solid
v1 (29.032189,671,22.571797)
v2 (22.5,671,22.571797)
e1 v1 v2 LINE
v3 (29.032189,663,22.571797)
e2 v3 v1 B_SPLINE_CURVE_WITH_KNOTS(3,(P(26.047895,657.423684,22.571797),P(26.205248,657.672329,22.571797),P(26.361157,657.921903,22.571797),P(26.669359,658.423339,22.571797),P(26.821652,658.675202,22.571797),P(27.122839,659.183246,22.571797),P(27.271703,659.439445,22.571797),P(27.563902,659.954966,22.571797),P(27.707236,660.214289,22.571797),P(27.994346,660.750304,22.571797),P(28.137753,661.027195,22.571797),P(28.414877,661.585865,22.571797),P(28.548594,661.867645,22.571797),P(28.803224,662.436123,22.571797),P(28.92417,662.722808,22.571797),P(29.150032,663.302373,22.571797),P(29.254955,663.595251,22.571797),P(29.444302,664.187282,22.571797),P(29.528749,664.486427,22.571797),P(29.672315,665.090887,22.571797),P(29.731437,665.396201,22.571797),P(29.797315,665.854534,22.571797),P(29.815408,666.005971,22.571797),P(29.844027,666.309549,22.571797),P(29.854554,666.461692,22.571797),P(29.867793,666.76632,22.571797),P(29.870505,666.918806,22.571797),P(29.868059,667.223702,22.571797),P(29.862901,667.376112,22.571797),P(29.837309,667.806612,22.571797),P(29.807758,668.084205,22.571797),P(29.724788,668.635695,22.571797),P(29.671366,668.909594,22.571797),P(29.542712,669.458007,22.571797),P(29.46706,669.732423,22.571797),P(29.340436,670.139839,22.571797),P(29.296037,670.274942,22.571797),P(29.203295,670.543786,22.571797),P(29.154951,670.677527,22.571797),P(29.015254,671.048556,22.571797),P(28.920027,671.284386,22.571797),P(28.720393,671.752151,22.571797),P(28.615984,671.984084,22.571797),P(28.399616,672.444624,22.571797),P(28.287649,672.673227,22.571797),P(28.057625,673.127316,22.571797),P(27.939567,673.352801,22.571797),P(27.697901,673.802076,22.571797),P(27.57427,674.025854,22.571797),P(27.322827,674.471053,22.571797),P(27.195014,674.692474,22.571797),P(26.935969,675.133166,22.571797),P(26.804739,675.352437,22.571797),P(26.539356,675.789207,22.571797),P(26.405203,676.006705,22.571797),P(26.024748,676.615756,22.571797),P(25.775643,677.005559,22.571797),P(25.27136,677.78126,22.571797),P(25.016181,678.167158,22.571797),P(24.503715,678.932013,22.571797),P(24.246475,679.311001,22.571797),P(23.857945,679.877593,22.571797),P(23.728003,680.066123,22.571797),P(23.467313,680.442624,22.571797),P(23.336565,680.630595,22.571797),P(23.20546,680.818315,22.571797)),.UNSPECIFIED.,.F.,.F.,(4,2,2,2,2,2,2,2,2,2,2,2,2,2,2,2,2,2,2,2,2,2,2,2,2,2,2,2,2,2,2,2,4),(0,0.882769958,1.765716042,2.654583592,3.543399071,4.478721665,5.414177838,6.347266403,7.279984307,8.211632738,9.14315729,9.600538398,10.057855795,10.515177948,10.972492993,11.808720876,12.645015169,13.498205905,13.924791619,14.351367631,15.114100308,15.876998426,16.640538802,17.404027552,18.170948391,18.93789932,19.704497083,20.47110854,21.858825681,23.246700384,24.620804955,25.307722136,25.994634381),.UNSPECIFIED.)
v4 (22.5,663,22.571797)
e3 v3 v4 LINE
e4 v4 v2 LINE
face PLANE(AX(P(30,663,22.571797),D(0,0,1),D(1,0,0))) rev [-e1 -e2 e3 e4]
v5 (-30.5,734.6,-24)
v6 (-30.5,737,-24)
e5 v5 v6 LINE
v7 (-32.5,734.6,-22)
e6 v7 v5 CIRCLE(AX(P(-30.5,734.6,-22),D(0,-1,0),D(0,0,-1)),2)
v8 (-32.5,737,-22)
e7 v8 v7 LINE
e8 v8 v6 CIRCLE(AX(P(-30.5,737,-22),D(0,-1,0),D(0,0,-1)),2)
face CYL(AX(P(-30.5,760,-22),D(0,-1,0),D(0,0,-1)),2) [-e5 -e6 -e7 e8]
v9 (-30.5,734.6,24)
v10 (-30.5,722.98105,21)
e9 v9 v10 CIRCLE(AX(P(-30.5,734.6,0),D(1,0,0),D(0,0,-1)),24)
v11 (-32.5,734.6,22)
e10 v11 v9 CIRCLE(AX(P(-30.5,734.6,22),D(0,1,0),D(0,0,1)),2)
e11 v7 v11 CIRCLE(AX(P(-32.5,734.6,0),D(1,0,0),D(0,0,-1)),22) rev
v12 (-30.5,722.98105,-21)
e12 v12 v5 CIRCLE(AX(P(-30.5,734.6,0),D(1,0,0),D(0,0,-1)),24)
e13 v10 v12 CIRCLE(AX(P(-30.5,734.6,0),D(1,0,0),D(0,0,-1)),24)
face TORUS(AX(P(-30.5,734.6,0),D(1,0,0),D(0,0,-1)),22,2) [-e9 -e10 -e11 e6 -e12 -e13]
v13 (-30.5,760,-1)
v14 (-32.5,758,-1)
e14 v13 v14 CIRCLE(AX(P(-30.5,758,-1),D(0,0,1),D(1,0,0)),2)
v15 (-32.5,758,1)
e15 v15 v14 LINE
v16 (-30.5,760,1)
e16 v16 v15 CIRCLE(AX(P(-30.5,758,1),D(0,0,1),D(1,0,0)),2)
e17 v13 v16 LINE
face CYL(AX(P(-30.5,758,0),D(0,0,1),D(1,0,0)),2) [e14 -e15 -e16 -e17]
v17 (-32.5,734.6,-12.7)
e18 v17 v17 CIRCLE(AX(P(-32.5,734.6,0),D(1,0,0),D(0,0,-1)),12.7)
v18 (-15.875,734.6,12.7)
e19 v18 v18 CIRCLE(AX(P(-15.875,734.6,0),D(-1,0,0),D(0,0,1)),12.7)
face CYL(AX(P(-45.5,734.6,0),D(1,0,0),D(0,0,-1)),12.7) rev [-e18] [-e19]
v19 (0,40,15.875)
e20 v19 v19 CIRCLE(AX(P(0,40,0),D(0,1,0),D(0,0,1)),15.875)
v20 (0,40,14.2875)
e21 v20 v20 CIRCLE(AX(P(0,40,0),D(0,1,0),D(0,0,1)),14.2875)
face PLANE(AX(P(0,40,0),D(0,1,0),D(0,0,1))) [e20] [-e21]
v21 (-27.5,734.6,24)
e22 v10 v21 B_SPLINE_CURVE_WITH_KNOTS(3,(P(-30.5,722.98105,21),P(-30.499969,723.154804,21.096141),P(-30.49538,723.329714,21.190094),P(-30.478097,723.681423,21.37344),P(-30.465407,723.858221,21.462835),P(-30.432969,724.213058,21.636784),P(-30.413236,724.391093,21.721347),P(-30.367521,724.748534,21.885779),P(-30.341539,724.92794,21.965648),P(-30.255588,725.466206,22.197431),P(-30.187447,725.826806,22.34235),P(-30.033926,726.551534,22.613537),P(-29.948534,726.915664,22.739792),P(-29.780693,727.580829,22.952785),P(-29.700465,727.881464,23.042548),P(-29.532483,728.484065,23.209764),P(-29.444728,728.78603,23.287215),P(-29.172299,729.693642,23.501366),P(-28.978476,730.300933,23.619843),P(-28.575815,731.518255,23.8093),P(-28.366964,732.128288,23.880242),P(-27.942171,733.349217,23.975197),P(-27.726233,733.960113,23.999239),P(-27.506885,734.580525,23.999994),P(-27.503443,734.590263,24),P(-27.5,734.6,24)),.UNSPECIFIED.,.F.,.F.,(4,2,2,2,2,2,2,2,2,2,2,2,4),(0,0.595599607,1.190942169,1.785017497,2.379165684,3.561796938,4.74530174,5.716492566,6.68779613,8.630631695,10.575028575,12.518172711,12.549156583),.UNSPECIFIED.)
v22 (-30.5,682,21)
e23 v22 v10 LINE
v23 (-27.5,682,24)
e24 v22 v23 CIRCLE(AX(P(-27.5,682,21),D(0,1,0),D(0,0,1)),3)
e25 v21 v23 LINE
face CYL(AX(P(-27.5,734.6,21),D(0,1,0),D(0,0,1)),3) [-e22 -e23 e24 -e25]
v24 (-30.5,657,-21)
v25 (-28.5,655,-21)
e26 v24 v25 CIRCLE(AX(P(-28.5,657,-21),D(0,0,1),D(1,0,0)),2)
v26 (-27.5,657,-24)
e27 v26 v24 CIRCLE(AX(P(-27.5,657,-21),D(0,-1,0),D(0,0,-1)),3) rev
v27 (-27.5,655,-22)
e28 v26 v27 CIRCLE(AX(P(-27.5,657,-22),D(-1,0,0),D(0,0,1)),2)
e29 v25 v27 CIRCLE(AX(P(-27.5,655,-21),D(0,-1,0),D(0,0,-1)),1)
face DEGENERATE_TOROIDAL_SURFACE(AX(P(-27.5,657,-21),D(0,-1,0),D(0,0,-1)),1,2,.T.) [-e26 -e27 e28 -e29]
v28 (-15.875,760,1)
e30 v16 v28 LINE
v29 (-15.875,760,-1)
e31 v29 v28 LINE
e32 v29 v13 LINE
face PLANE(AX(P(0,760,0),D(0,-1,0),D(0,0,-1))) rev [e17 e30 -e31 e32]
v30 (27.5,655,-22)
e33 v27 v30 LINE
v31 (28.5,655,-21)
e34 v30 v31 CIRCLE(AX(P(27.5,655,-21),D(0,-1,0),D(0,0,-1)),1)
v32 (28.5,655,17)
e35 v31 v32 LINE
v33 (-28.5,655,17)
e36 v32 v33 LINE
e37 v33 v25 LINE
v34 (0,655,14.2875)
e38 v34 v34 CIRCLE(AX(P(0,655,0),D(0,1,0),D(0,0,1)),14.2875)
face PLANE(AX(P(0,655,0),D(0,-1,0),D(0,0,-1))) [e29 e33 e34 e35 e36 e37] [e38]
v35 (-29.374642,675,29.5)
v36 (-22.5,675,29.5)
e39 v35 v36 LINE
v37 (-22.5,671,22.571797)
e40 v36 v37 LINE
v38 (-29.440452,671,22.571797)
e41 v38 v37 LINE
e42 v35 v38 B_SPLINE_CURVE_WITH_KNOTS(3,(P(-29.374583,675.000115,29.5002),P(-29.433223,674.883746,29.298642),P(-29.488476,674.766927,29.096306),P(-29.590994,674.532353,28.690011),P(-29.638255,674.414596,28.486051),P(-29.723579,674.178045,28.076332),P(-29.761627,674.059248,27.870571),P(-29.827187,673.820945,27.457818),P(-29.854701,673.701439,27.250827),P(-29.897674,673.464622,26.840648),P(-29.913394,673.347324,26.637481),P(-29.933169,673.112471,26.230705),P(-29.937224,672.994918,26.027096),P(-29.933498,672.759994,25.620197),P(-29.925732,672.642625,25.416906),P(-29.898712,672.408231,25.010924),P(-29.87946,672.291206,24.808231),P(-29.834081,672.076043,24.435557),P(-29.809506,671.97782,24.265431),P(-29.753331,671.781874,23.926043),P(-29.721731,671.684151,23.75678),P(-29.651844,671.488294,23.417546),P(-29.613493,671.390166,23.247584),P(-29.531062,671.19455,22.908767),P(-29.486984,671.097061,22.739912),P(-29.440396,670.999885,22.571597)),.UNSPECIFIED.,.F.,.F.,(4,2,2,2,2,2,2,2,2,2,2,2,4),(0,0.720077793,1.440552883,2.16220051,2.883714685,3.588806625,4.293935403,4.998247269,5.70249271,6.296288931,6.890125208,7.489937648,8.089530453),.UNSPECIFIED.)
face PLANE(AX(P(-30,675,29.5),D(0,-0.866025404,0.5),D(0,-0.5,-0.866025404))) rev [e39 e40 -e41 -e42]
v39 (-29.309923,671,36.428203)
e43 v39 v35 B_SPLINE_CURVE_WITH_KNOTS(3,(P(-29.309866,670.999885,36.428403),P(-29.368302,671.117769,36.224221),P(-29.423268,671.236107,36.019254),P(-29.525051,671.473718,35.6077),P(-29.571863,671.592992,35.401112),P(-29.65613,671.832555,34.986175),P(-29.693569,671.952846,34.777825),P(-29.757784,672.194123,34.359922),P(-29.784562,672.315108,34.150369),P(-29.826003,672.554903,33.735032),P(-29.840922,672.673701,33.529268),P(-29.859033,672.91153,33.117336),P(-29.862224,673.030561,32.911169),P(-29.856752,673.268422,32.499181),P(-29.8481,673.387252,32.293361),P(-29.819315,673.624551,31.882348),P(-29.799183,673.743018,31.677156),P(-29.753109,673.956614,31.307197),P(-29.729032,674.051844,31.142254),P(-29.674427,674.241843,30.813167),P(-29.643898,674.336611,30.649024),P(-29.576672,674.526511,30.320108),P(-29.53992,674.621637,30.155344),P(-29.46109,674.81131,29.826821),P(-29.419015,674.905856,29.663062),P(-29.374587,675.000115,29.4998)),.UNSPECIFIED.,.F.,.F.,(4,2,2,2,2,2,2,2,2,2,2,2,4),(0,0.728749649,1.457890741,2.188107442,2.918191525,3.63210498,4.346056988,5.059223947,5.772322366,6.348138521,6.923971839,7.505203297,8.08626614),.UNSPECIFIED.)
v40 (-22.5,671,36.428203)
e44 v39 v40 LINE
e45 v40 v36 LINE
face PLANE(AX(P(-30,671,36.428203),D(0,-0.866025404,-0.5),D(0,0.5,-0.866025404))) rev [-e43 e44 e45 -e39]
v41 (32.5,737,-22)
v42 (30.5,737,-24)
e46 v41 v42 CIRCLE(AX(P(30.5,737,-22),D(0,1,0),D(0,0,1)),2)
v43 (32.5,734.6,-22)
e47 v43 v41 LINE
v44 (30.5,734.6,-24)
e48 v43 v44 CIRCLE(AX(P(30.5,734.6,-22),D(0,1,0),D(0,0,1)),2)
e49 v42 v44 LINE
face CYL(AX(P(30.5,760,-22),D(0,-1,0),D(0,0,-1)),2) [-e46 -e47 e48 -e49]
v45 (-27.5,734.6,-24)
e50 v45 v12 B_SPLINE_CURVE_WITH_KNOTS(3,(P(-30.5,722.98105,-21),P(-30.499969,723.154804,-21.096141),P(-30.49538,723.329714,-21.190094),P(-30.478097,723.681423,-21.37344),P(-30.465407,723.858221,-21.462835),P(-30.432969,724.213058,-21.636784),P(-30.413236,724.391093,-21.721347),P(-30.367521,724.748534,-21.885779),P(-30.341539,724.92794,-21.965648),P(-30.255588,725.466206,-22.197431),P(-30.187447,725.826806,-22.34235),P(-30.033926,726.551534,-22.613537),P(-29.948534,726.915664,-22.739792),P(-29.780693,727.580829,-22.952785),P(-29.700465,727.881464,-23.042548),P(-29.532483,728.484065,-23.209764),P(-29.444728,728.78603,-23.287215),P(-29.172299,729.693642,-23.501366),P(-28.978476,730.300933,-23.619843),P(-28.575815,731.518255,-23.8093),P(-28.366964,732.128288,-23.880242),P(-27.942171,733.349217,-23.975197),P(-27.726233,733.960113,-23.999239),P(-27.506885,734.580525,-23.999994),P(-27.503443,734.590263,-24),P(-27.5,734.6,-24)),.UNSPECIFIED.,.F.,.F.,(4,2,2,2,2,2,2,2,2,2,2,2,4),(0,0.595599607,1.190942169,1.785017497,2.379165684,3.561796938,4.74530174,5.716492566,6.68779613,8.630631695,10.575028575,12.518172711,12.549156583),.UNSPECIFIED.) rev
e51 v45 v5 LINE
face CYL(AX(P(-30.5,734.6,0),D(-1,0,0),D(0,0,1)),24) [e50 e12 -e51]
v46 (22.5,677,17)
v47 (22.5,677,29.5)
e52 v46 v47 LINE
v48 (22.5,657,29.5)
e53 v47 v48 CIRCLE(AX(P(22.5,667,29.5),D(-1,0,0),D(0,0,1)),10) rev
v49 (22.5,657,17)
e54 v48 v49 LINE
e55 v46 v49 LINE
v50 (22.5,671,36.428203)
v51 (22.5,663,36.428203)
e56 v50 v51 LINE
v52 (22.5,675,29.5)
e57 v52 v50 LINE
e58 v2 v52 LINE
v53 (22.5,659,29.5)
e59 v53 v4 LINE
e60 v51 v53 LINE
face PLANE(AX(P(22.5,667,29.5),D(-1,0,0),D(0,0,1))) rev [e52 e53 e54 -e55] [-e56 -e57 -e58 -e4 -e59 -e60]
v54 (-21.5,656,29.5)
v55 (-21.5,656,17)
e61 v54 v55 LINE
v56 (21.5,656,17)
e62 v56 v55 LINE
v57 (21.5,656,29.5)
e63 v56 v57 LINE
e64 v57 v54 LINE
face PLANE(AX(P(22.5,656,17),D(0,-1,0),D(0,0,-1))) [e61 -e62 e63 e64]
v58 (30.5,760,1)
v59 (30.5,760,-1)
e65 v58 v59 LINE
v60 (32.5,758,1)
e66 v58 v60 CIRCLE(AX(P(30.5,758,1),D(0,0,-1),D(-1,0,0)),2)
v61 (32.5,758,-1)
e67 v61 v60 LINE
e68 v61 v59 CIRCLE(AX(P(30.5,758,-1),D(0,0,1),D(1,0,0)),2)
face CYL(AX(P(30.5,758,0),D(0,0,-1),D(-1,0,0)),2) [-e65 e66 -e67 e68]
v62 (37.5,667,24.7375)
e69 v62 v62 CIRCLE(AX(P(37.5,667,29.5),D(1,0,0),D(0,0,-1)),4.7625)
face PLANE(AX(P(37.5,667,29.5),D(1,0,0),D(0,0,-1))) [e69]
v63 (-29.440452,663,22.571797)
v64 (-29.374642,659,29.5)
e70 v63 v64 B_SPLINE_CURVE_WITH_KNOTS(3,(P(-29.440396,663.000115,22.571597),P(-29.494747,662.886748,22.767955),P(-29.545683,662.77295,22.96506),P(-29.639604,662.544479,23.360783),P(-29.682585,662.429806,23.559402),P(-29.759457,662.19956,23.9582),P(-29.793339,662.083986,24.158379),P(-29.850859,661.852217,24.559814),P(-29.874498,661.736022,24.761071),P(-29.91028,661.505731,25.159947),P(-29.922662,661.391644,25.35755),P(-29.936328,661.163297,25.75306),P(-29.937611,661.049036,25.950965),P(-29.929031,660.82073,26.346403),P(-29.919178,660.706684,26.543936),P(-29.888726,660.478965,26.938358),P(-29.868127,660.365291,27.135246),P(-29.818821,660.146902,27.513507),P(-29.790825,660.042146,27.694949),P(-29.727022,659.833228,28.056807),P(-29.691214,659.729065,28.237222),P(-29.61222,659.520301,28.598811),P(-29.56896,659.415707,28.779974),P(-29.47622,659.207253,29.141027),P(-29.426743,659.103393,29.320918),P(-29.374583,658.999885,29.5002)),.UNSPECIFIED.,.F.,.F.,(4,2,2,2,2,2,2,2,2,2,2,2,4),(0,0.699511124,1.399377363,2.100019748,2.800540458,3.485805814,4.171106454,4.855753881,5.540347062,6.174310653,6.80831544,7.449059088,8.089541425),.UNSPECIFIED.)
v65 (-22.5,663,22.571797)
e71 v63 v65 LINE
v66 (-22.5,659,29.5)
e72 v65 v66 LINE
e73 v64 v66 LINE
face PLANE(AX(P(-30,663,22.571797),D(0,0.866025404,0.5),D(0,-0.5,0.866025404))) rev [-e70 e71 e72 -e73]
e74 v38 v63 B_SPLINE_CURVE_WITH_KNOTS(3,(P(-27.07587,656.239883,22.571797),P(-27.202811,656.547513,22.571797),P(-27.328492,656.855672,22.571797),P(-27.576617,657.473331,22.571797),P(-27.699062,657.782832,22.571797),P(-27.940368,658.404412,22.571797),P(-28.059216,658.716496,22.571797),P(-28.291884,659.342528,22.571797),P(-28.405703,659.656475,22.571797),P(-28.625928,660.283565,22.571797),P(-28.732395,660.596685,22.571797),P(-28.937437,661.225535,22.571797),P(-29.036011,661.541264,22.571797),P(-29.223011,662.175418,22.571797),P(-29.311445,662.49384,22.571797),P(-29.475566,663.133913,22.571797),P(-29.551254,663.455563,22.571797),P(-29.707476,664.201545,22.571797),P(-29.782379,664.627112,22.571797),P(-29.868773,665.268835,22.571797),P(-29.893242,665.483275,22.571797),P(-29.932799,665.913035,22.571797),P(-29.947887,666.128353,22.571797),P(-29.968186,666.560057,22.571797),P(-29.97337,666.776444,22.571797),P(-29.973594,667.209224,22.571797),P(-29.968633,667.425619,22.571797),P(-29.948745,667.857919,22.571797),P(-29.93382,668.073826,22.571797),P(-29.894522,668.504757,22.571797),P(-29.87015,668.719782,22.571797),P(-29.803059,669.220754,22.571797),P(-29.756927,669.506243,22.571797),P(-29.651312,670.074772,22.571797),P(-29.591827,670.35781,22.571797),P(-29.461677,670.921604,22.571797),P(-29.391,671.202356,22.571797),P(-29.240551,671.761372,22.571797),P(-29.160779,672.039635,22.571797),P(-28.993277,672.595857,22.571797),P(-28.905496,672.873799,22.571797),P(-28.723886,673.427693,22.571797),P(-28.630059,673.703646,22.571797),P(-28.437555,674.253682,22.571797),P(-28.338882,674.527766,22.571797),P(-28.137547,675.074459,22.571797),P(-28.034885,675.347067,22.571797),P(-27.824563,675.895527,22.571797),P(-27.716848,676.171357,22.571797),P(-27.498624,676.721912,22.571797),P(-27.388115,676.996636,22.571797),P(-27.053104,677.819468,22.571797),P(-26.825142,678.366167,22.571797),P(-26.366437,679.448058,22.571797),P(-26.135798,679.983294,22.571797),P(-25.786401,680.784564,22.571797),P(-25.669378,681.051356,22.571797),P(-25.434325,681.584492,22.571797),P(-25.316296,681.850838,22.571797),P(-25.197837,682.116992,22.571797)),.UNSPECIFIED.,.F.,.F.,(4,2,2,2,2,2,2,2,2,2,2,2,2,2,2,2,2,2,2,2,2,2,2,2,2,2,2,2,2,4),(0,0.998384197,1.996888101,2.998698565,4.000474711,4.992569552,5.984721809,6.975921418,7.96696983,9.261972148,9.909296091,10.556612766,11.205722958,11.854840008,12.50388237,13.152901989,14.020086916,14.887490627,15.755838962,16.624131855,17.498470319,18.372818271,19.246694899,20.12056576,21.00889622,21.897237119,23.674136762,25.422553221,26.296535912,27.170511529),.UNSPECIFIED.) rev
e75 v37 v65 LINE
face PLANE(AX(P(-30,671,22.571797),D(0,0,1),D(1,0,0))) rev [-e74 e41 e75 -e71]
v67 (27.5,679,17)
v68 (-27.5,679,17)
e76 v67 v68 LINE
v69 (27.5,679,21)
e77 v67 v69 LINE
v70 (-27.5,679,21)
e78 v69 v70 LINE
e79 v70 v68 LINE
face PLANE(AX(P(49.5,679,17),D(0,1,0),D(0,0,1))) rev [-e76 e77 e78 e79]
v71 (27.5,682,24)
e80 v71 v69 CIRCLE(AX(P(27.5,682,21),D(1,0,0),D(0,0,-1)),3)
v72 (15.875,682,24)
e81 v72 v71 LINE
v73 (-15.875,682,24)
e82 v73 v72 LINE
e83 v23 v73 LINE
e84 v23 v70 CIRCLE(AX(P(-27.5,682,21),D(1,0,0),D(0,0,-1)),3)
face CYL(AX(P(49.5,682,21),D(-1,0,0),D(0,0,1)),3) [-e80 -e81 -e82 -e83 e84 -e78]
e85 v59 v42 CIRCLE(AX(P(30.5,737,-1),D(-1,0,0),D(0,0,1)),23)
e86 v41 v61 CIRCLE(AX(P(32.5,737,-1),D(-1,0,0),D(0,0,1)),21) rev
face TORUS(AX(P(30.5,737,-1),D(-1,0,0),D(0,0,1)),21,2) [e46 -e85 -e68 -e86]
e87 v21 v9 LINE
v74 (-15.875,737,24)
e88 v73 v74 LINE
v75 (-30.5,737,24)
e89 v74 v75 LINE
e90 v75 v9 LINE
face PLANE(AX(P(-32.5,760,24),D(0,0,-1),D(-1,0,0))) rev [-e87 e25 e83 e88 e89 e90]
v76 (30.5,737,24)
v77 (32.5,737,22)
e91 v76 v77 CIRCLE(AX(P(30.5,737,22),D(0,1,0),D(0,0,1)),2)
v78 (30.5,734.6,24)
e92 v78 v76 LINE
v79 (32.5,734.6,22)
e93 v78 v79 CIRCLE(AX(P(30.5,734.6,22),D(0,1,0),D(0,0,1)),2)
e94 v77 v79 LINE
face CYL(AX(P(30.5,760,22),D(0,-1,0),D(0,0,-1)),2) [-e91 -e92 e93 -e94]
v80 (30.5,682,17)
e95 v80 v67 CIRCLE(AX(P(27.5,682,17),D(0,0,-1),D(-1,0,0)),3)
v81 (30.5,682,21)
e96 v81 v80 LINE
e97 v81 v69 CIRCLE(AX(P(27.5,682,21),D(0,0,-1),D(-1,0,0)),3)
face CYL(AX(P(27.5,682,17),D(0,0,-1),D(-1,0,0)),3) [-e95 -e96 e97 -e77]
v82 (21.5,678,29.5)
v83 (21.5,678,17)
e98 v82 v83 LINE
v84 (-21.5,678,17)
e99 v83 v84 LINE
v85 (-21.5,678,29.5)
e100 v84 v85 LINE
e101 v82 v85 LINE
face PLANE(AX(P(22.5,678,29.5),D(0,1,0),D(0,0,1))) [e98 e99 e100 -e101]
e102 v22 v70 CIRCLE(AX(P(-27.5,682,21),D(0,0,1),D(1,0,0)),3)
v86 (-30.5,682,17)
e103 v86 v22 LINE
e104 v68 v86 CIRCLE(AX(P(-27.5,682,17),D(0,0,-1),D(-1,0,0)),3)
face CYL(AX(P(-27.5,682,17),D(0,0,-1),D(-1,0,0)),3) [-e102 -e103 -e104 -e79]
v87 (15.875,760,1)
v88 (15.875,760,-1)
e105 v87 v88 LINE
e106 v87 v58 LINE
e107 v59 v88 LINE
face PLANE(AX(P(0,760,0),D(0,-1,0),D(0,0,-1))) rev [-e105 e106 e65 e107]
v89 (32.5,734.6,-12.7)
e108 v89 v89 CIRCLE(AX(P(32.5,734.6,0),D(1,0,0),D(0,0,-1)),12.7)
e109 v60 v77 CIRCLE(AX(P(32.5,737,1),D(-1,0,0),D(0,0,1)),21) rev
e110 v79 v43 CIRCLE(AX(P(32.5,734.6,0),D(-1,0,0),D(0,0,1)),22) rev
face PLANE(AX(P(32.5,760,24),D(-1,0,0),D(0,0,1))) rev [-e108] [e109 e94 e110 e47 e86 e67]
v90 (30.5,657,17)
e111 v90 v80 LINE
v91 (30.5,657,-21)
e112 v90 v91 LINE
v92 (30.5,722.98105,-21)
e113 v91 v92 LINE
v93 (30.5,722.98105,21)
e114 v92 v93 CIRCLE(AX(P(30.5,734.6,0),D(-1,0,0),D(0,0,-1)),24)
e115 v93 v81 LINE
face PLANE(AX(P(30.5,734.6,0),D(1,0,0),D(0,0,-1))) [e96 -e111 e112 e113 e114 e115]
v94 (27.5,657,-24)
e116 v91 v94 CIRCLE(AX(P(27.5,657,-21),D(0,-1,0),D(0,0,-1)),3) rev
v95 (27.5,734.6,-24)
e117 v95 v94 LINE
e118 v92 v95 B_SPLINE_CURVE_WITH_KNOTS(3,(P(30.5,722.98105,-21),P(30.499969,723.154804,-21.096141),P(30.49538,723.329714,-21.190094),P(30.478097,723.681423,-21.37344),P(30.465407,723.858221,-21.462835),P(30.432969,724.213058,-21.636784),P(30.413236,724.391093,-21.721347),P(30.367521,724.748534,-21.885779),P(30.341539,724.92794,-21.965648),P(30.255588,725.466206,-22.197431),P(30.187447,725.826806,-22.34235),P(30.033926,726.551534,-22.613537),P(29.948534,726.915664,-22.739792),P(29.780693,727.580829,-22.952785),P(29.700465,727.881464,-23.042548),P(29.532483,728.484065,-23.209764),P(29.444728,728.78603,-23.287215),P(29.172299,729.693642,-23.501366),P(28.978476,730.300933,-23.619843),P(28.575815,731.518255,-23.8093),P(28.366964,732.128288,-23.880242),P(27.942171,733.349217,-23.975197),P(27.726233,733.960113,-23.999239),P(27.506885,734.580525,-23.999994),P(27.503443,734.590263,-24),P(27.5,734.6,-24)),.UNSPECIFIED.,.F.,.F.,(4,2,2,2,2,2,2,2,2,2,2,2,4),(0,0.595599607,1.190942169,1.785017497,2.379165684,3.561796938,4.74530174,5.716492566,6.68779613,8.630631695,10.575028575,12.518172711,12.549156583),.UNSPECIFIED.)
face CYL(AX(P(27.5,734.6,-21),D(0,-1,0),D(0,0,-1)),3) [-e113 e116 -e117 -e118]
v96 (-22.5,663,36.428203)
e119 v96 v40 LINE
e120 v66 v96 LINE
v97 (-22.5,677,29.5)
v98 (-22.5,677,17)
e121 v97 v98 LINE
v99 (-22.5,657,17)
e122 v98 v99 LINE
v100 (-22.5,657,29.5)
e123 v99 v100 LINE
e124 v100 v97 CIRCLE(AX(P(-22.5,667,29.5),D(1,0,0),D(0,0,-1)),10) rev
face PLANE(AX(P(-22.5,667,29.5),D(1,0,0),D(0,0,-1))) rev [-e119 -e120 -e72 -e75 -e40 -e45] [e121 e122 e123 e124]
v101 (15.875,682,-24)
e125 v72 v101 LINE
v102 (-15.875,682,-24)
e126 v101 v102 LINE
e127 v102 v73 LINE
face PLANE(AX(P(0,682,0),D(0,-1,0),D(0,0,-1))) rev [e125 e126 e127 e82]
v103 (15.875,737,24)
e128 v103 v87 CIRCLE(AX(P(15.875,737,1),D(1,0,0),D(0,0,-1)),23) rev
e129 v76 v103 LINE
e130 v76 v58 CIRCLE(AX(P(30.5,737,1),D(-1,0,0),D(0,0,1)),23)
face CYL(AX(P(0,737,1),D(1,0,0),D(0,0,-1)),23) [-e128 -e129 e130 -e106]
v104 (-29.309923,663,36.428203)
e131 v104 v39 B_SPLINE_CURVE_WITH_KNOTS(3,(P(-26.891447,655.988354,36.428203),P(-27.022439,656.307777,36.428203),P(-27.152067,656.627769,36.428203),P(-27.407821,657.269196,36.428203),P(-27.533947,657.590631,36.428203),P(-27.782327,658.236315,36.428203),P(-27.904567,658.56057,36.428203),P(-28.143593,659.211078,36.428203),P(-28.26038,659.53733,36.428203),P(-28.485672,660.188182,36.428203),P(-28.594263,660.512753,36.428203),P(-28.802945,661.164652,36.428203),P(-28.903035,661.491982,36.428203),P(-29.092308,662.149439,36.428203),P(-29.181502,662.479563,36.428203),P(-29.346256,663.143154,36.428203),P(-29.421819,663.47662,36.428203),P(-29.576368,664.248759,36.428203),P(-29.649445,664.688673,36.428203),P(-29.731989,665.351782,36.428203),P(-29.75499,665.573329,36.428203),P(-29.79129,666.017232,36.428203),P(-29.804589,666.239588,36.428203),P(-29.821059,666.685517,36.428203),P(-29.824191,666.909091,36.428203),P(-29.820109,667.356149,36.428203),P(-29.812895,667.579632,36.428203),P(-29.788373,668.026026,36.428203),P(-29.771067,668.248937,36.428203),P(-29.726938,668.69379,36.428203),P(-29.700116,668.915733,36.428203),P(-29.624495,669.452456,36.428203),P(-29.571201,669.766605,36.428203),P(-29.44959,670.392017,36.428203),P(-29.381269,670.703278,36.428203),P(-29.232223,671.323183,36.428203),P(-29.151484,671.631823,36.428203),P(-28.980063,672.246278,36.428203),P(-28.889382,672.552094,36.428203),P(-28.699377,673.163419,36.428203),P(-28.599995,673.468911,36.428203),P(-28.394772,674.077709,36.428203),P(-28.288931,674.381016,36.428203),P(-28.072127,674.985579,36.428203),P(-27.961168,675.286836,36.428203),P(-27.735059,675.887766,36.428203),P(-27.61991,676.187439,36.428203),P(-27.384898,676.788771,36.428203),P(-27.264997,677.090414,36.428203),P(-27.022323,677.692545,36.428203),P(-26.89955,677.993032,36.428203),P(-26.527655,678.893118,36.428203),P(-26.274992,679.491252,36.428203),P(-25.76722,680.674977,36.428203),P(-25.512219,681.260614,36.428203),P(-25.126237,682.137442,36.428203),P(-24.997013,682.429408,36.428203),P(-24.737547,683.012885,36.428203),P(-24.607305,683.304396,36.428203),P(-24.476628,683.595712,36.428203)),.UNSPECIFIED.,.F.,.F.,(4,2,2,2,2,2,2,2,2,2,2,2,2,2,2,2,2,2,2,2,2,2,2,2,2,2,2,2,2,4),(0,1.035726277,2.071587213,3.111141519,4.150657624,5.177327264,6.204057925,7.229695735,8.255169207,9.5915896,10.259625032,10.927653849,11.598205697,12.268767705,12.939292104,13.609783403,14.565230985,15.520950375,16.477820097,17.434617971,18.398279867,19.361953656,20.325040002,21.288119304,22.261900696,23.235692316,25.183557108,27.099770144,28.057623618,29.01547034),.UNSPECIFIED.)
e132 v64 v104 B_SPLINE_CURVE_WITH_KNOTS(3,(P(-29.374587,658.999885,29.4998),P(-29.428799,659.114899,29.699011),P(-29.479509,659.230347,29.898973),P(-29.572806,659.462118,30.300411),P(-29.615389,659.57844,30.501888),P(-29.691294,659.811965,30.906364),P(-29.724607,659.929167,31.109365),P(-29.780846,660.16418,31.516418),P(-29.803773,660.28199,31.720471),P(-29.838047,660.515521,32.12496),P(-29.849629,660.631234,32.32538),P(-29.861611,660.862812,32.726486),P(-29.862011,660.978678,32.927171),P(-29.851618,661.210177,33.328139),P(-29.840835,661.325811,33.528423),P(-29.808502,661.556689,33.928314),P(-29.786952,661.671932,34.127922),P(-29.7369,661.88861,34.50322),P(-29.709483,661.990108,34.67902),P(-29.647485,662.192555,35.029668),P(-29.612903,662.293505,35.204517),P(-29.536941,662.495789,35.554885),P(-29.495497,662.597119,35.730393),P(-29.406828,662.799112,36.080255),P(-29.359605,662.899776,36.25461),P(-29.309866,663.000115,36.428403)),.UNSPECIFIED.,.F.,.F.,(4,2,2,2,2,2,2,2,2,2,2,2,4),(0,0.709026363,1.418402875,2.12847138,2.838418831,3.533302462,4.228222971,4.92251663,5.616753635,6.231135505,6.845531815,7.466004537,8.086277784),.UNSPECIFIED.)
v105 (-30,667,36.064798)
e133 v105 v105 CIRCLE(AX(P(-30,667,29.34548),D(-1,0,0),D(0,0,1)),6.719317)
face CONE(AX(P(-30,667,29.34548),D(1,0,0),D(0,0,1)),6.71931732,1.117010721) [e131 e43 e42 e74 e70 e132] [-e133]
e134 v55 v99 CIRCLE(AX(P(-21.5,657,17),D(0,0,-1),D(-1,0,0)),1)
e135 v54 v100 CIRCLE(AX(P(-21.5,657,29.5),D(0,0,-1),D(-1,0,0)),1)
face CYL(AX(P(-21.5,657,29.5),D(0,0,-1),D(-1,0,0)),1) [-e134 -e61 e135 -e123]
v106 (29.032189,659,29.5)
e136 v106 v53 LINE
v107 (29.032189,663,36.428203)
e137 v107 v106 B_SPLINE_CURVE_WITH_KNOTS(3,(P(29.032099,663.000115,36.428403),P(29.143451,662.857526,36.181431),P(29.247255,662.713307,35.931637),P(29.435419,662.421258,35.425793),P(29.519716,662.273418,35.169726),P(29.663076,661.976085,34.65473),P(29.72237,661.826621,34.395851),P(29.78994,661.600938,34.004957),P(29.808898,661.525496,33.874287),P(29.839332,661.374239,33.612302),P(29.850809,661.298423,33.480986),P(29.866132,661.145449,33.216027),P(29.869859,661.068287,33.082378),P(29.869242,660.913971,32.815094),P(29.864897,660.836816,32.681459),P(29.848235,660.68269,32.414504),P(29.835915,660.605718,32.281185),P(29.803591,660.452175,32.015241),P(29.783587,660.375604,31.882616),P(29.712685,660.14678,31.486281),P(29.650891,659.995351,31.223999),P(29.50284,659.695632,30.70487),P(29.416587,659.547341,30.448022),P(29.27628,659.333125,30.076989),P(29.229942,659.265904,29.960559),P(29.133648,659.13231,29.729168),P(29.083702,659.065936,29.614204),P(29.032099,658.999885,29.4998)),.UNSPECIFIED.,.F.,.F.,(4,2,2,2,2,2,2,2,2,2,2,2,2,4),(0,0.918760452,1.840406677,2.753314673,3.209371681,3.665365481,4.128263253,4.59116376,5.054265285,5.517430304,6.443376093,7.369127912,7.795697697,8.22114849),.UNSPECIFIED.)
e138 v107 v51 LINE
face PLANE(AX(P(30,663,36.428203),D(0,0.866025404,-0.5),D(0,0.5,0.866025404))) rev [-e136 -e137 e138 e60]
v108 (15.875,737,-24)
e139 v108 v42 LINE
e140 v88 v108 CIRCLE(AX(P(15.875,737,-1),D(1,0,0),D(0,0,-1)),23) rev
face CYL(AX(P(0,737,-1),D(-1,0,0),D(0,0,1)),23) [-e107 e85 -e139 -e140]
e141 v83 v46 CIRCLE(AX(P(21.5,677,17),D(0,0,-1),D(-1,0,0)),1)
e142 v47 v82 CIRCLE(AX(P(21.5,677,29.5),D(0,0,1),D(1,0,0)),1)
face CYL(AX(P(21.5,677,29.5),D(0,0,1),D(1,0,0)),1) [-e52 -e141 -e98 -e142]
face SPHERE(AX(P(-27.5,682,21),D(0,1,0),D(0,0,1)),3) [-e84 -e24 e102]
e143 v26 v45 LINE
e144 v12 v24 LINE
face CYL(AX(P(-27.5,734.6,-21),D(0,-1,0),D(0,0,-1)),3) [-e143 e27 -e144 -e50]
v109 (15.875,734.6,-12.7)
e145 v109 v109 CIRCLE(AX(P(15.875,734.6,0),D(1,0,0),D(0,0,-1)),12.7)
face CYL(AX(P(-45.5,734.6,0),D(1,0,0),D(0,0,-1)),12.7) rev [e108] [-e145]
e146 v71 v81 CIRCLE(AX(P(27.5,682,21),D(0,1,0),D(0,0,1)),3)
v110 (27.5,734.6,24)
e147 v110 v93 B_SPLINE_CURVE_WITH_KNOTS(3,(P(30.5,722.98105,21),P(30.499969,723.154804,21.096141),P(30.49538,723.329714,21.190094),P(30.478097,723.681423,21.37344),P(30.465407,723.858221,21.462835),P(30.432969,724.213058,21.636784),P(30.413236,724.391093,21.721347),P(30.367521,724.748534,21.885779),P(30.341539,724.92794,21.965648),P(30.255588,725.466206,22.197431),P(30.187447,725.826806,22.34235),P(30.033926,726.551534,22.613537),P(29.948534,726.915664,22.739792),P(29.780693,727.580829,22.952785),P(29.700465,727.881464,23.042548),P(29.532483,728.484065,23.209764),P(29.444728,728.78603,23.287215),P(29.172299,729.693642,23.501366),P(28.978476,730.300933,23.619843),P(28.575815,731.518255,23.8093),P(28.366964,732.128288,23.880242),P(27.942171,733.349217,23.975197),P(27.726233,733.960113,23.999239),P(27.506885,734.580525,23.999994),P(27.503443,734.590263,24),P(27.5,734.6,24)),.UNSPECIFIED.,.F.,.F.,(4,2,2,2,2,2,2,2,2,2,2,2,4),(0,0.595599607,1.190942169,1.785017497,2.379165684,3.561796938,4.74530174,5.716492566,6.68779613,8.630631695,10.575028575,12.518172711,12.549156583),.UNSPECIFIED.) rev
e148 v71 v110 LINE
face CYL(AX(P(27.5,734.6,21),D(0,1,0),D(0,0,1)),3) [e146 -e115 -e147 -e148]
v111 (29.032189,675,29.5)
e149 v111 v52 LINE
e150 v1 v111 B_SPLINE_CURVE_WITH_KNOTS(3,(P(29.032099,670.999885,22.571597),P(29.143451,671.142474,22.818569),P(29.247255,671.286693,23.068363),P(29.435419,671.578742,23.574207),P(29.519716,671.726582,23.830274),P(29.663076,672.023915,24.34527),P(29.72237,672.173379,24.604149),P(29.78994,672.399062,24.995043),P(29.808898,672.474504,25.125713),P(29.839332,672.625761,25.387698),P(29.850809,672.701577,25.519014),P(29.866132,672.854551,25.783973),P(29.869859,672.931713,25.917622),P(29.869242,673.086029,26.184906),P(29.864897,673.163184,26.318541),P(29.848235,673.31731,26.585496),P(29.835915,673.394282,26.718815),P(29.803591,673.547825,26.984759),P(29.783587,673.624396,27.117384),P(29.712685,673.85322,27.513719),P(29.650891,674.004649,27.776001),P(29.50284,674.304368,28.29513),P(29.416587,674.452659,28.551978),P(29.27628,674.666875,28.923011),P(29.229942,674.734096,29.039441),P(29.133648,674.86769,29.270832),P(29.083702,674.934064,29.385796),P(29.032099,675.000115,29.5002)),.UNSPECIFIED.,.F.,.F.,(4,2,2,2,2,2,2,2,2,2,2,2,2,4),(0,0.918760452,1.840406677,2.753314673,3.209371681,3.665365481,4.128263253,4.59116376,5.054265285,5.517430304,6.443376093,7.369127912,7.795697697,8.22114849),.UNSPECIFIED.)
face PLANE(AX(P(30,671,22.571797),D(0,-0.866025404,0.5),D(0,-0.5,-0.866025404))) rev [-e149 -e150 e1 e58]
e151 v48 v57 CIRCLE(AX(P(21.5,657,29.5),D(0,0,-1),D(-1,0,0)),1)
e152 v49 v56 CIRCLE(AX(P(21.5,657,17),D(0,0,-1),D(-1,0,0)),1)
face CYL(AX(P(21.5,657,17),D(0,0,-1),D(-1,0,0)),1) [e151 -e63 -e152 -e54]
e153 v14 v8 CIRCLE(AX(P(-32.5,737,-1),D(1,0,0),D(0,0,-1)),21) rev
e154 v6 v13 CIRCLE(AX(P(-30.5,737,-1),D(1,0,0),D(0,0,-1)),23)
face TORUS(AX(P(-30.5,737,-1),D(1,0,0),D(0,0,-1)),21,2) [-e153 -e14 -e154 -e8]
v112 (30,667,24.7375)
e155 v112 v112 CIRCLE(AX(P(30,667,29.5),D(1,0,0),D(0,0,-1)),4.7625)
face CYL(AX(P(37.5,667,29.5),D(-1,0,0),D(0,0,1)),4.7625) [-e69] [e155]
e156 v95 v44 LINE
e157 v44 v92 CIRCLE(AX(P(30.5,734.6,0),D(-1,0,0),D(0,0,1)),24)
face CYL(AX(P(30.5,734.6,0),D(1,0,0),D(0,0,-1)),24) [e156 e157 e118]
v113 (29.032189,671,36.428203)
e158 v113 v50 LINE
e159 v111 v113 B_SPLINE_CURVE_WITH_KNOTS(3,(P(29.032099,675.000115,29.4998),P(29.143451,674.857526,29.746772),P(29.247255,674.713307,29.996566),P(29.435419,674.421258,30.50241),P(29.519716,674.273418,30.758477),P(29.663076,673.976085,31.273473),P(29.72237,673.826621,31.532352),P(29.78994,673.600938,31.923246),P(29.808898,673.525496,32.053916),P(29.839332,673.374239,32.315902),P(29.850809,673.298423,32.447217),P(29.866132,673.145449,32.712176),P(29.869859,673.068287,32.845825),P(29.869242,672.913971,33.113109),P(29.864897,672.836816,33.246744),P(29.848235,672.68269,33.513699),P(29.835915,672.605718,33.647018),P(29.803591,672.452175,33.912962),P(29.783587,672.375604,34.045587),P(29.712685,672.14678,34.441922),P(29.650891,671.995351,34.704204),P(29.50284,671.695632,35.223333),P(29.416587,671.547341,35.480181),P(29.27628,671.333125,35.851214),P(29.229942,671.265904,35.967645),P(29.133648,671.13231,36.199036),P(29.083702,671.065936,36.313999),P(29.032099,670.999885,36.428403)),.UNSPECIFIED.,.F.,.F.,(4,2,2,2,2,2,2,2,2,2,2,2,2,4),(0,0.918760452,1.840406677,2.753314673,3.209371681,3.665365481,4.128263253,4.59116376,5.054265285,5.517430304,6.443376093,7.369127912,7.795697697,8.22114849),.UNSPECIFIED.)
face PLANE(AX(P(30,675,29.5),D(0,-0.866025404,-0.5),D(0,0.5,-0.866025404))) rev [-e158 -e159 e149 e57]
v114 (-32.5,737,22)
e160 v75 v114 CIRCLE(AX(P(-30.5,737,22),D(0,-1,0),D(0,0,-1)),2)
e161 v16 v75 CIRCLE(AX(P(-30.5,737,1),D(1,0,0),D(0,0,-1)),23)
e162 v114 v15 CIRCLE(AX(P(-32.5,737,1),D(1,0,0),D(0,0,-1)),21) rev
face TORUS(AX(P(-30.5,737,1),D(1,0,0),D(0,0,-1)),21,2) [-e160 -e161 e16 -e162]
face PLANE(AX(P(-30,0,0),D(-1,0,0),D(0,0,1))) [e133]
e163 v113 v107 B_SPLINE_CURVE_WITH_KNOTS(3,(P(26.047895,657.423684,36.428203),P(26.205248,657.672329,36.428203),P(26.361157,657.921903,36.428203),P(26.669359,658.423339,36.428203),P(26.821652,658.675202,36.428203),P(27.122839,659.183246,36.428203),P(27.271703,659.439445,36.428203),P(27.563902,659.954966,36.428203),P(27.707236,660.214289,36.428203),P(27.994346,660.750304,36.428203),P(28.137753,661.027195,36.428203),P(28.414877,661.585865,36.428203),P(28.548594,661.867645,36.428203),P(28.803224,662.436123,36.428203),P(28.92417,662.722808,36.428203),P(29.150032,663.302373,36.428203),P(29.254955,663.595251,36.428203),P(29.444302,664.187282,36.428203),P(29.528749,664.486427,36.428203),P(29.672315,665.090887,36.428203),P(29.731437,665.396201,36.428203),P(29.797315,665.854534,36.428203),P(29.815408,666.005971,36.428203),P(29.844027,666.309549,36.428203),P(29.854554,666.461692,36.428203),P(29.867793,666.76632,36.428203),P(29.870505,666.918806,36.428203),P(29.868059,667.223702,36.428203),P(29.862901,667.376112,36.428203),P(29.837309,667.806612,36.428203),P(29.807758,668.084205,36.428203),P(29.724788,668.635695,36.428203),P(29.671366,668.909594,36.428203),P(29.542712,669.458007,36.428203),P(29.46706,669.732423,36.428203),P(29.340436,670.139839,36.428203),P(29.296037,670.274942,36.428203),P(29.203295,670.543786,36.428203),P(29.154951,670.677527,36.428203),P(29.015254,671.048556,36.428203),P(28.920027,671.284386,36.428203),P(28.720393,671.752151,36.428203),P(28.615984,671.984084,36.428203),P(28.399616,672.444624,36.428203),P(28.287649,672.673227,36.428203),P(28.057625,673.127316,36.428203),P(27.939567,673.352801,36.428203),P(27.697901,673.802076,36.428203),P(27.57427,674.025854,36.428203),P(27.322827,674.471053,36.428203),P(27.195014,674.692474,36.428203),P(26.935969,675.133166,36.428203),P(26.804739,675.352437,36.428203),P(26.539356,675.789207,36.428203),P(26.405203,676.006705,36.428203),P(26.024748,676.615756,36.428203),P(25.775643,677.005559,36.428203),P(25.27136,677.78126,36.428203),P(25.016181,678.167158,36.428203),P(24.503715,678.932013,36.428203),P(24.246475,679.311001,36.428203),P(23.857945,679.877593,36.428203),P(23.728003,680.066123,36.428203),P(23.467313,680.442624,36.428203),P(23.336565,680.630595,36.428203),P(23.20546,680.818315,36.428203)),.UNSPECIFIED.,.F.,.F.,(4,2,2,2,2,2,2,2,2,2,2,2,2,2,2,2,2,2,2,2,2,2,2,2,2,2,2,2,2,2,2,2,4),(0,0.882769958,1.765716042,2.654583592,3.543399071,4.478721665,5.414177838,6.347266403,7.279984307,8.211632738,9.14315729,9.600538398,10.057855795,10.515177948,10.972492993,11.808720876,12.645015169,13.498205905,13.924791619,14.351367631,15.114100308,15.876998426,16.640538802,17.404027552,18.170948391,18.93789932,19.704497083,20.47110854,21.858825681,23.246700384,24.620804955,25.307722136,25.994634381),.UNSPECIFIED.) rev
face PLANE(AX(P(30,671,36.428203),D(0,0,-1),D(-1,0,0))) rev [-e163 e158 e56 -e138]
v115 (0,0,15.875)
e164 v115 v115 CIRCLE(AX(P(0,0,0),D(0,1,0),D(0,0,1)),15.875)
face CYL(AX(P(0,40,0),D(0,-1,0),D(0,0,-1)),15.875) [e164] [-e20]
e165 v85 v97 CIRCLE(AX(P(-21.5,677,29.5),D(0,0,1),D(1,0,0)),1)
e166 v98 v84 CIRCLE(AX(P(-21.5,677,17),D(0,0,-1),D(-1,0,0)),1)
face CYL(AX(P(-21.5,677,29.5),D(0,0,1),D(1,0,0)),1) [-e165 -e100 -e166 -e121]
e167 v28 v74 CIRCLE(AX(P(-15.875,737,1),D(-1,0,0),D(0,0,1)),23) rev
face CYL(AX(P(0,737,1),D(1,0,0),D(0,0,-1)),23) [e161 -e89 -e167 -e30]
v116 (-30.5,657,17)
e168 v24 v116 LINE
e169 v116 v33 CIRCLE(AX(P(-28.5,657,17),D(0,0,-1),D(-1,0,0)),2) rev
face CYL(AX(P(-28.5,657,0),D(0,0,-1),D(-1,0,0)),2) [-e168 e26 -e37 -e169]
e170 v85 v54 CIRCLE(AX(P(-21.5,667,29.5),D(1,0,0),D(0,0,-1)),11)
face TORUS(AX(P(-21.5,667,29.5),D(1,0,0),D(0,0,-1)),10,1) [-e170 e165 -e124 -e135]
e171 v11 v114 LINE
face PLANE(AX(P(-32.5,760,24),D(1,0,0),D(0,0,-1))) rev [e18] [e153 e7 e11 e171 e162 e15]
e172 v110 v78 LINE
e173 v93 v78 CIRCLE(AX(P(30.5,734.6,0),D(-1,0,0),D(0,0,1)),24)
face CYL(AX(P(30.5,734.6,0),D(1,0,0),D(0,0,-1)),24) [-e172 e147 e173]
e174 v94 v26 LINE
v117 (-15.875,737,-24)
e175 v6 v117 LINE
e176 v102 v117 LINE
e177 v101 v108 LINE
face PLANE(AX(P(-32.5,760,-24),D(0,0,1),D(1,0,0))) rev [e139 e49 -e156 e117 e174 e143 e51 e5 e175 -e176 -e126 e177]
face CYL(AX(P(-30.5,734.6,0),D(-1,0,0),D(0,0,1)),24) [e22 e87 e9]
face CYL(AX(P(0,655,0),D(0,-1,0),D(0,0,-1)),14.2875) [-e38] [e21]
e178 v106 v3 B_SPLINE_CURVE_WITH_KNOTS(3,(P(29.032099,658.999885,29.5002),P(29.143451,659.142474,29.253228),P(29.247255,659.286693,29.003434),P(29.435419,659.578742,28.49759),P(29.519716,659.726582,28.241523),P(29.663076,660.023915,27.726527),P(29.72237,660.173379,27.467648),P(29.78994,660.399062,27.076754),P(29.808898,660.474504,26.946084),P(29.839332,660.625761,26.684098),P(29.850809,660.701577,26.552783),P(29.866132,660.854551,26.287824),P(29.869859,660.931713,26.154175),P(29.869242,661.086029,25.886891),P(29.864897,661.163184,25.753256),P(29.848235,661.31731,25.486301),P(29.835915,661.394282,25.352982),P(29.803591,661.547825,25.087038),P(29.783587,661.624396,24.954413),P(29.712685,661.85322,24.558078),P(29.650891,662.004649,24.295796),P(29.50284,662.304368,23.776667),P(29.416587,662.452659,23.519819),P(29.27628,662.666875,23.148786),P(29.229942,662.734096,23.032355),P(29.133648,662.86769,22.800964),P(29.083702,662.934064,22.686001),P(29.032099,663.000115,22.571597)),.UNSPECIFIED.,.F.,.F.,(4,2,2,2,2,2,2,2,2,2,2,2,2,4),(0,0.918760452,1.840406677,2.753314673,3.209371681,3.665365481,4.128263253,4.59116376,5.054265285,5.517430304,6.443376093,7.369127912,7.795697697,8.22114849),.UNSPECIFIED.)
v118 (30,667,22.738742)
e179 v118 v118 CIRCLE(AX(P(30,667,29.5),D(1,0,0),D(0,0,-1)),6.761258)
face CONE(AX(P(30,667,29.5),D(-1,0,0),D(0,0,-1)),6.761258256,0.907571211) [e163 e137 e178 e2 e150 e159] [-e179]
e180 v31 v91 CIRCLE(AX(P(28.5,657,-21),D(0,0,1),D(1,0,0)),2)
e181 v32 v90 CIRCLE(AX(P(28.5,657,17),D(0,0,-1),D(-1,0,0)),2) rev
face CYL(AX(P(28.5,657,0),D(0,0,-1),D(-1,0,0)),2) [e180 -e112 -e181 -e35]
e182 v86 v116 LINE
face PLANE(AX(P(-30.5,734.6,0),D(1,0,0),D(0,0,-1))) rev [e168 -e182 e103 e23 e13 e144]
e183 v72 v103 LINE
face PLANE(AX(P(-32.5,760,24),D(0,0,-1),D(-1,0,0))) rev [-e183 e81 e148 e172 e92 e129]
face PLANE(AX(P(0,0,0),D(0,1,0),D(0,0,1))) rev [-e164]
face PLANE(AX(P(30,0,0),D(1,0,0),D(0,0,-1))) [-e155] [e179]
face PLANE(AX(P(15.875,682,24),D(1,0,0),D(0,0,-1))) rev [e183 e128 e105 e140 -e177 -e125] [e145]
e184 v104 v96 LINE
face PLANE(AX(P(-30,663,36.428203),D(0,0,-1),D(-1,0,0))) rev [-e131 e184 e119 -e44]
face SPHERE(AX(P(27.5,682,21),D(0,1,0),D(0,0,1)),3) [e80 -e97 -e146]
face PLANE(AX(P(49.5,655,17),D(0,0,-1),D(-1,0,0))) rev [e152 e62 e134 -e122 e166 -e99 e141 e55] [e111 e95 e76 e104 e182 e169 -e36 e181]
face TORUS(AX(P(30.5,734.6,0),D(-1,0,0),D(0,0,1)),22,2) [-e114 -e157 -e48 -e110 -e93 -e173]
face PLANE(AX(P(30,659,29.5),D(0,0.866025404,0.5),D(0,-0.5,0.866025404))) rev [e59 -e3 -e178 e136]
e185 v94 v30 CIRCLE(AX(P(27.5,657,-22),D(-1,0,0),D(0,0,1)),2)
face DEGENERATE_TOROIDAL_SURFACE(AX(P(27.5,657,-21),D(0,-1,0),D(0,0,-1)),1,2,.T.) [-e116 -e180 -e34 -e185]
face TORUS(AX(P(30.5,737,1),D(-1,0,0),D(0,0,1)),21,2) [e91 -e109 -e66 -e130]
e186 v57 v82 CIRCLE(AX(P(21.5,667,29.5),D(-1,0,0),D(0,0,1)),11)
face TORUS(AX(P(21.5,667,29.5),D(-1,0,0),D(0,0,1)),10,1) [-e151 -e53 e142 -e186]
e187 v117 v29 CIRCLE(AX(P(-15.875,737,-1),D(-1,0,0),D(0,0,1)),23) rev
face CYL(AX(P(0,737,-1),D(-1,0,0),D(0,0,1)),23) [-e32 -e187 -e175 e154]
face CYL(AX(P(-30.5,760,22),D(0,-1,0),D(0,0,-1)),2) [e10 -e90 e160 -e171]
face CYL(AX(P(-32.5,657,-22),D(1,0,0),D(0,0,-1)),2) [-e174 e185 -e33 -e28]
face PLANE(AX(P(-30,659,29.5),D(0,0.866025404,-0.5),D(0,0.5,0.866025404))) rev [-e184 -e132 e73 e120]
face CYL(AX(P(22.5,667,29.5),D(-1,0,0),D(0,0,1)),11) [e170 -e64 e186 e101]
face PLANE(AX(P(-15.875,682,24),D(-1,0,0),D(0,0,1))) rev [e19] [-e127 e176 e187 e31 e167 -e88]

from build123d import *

# Parameters (mm, degrees)
CROQUIS1_R              = 15.875
SALIENTE_EXTRUIR1_DEPTH = 40
CROQUIS2_R              = 14.2875
SALIENTE_EXTRUIR2_DEPTH = 615
CROQUIS3_W              = 65
CROQUIS3_H              = 48
SALIENTE_EXTRUIR3_DEPTH = 105
CROQUIS4_W              = 31.75
CROQUIS4_H              = 48
CORTAR_EXTRUIR1_DEPTH   = 78
REDONDEO1_R             = 23
CROQUIS5_R              = 12.7
CORTAR_EXTRUIR2_DEPTH   = 78
CORTAR_EXTRUIR3_DEPTH   = 2
CORTAR_EXTRUIR4_START   = -2
CORTAR_EXTRUIR4_DEPTH   = 2
REDONDEO3_R             = 3
REDONDEO4_START         = 654
REDONDEO4_DEPTH         = 56.5999999
REDONDEO4_START_2       = 710.5999999
REDONDEO4_2_DEPTH       = 24.0000002
REDONDEO4_START_3       = 27.4999999
REDONDEO4_3_DEPTH       = 3.0000001
REDONDEO4_START_4       = -30.5
REDONDEO4_4_DEPTH       = 3
REDONDEO5_R             = 2
REDONDEO6_R             = 2
CROQUIS9_W              = 7
CROQUIS9_H              = 24
CORTAR_EXTRUIR5_DEPTH   = 80
SALIENTE_EXTRUIR4_DEPTH = 53
REDONDEO7_R             = 3
CORTAR_EXTRUIR6_DEPTH   = 8
CROQUIS14_R             = 4.7625
CORTAR_EXTRUIR7_DEPTH   = 45
SALIENTE_EXTRUIR5_DEPTH = 7.5
CROQUIS16_R             = 6.71931732
CORTAR_EXTRUIR8_DEPTH   = 3
CORTAR_EXTRUIR8_DRAFT   = -64
REDONDEO8_R             = 1
CROQUIS17_R             = 4.7625
SALIENTE_EXTRUIR6_DEPTH = 60
CROQUIS18_R             = 4.7625
SALIENTE_EXTRUIR7_DEPTH = 7.5
CROQUIS19_R             = 6.761258256
CORTAR_EXTRUIR9_DEPTH   = 4
CORTAR_EXTRUIR9_DRAFT   = -52


with BuildPart() as part:
    # Croquis1 → Saliente-Extruir1 (new body)
    with BuildSketch(Plane(origin=(0, 0, 0), x_dir=(1, 0, 0), z_dir=(0, 1, 0))):
        with Locations(Location((0, 0, 0), (0, 0, 270))):
            Circle(CROQUIS1_R)
    extrude(amount=SALIENTE_EXTRUIR1_DEPTH)

    # Croquis2 → Saliente-Extruir2 (add)
    with BuildSketch(Plane(origin=(0, 40, 0), x_dir=(1, 0, 0), z_dir=(0, 1, 0))):
        with Locations(Location((0, 0, 0), (0, 0, 270))):
            Circle(CROQUIS2_R)
    extrude(amount=SALIENTE_EXTRUIR2_DEPTH)

    # Croquis3 → Saliente-Extruir3 (add)
    with BuildSketch(Plane(origin=(0, 655, 0), x_dir=(1, 0, 0), z_dir=(0, 1, 0))):
        Rectangle(CROQUIS3_W, CROQUIS3_H)
    extrude(amount=SALIENTE_EXTRUIR3_DEPTH)

    # Croquis4 → Cortar-Extruir1 (cut)
    with BuildSketch(Plane(origin=(0, 760, 0), x_dir=(1, 0, 0), z_dir=(0, 1, 0))):
        Rectangle(CROQUIS4_W, CROQUIS4_H)
    extrude(amount=-CORTAR_EXTRUIR1_DEPTH, mode=Mode.SUBTRACT)

    # Redondeo1
    redondeo1_edges = [part.edges().sort_by_distance(p)[0] for p in [
        (24.1875, 760, -24),
        (-24.1875, 760, 24),
        (-24.1875, 760, -24),
        (24.1875, 760, 24),
    ]]
    fillet(redondeo1_edges, radius=REDONDEO1_R)

    # Croquis5 → Cortar-Extruir2 (cut)
    with BuildSketch(Plane(origin=(32.5, 0, 0), x_dir=(0, 0, -1), z_dir=(1, 0, 0))):
        with Locations((0, 734.6)):
            Circle(CROQUIS5_R)
    extrude(amount=-CORTAR_EXTRUIR2_DEPTH, mode=Mode.SUBTRACT)

    # Croquis6 → Cortar-Extruir3 (cut)
    with BuildSketch(Plane(origin=(32.5, 0, 0), x_dir=(0, 0, -1), z_dir=(1, 0, 0))):
        with BuildLine():
            Line((24, 734.6), (24, 655))
            Line((24, 655), (-24, 655))
            Line((-24, 655), (-24, 734.6))
            ThreePointArc((-24, 734.6), (0, 710.6), (24, 734.6))
        make_face()
    extrude(amount=-CORTAR_EXTRUIR3_DEPTH, mode=Mode.SUBTRACT)

    # Croquis7 → Cortar-Extruir4 (cut)
    with BuildSketch(Plane.ZY.offset(32.5).offset(CORTAR_EXTRUIR4_START)):
        with BuildLine():
            Line((-24, 734.6), (-24, 655))
            Line((-24, 655), (24, 655))
            Line((24, 655), (24, 734.6))
            ThreePointArc((24, 734.6), (0, 710.6), (-24, 734.6))
        make_face()
    extrude(amount=CORTAR_EXTRUIR4_DEPTH, mode=Mode.SUBTRACT)

    # Redondeo3
    redondeo3_edges = [part.edges().sort_by_distance(p)[0] for p in [
        (30.5, 694.8, -24),
        (-30.5, 694.8, -24),
    ]]
    fillet(redondeo3_edges, radius=REDONDEO3_R)

    # Redondeo4: read off the stored shape, not the designer's step
    # Redondeo4 outline → Redondeo4 (cut)
    with BuildSketch(Plane(origin=(0, 0, 0), x_dir=(1, 0, 0), z_dir=(0, 1, 0)).offset(REDONDEO4_START)):
        with BuildLine():
            ThreePointArc((30.5, -21), (29.621320344, -23.121320344), (27.5, -24))
            Line((27.5, -24), (30.5, -24))
            Line((30.5, -24), (30.5, -21))
        make_face()
        with BuildLine():
            Line((-30.5, -24), (-27.5, -24))
            ThreePointArc((-27.5, -24), (-29.621320344, -23.121320344), (-30.5, -21))
            Line((-30.5, -21), (-30.5, -24))
        make_face()
    extrude(amount=REDONDEO4_DEPTH, mode=Mode.SUBTRACT)

    # Redondeo4 2 outline → Redondeo4 2 (cut)
    with BuildSketch(Plane(origin=(0, 0, 0), x_dir=(1, 0, 0), z_dir=(0, 1, 0)).offset(REDONDEO4_START_2)):
        with BuildLine():
            ThreePointArc((30.5, -21), (29.621320344, -23.121320344), (27.5, -24))
            Line((27.5, -24), (30.5, -24))
            Line((30.5, -24), (30.5, -21))
        make_face()
        with BuildLine():
            Line((-30.5, -24), (-27.5, -24))
            ThreePointArc((-27.5, -24), (-29.621320344, -23.121320344), (-30.5, -21))
            Line((-30.5, -21), (-30.5, -24))
        make_face()
    extrude(amount=REDONDEO4_2_DEPTH, mode=Mode.SUBTRACT)

    # Redondeo4 3 outline → Redondeo4 3 (add)
    with BuildSketch(Plane.YZ.offset(REDONDEO4_START_3)):
        with BuildLine():
            Line((734.6000001, 21), (734.6, 24))
            ThreePointArc((734.6, 24), (728.6, 23.237900077), (722.981049961, 21))
            Line((722.981049961, 21), (734.6000001, 21))
        make_face()
    extrude(amount=REDONDEO4_3_DEPTH)

    # Redondeo4 4 outline → Redondeo4 4 (add)
    with BuildSketch(Plane.YZ.offset(REDONDEO4_START_4)):
        with BuildLine():
            Line((734.6000001, 21), (734.6, 24))
            ThreePointArc((734.6, 24), (728.6, 23.237900077), (722.981049961, 21))
            Line((722.981049961, 21), (734.6000001, 21))
        make_face()
    extrude(amount=REDONDEO4_4_DEPTH)

    # Redondeo5
    redondeo5_edges = [part.edges().sort_by_distance(p)[0] for p in [
        (-32.5, 760, 0),
        (-32.5, 735.8, 24),
        (32.5, 735.8, 24),
        (-32.5, 735.8, -24),
        (-32.5, 753.263455967, -17.263455967),
        (-32.5, 753.263455967, 17.263455967),
        (32.5, 735.8, -24),
        (32.5, 760, 0),
        (32.5, 753.263455967, -17.263455967),
        (32.5, 753.263455967, 17.263455967),
        (32.5, 710.6, 0),
        (-32.5, 710.6, 0),
    ]]
    fillet(redondeo5_edges, radius=REDONDEO5_R - 0.0001)  # a hair under: the kernel refuses the full size

    # Redondeo6
    redondeo6_edges = [part.edges().sort_by_distance(p)[0] for p in [
        (-30.5, 655, 0),
        (0, 655, -24),
        (29.621320344, 655, -23.121320344),
        (-29.621320344, 655, -23.121320344),
        (30.5, 655, 0),
        (0, 655, 24),
        (-29.621320344, 655, 23.121320344),
        (29.621320344, 655, 23.121320344),
    ]]
    fillet(redondeo6_edges, radius=REDONDEO6_R)

    # Croquis9 → Cortar-Extruir5 (cut)
    with BuildSketch(Plane.ZY.offset(30.5)):
        with Locations((20.5, 667)):
            Rectangle(CROQUIS9_W, CROQUIS9_H)
    extrude(amount=-CORTAR_EXTRUIR5_DEPTH, mode=Mode.SUBTRACT)

    # Croquis10 → Saliente-Extruir4 (add)
    with BuildSketch(Plane.ZY.offset(30.5)):
        with BuildLine():
            Line((29.5, 678), (17, 678))
            Line((17, 678), (17, 656))
            Line((17, 656), (29.5, 656))
            ThreePointArc((29.5, 656), (40.5, 667), (29.5, 678))
        make_face()
    extrude(amount=-SALIENTE_EXTRUIR4_DEPTH)

    # Redondeo7
    redondeo7_edges = [part.edges().sort_by_distance(p)[0] for p in [
        (-29.621320344, 679, 23.121320344),
        (30.5, 679, 19),
        (29.621320344, 679, 23.121320344),
        (-30.5, 679, 19),
        (0, 679, 24),
    ]]
    fillet(redondeo7_edges, radius=REDONDEO7_R - 0.0001)  # a hair under: the kernel refuses the full size

    # Croquis11 → Cortar-Extruir6 (cut)
    with BuildSketch(Plane.ZY.offset(30.5)):
        with BuildLine():
            Line((29.5, 678), (17, 678))
            Line((17, 678), (17, 656))
            Line((17, 656), (29.5, 656))
            ThreePointArc((29.5, 656), (40.5, 667), (29.5, 678))
        make_face()
    extrude(amount=-CORTAR_EXTRUIR6_DEPTH, mode=Mode.SUBTRACT)

    # Croquis14 → Cortar-Extruir7 (cut)
    with BuildSketch(Plane.ZY.offset(22.5)):
        with Locations((29.5, 667)):
            Circle(CROQUIS14_R)
    extrude(amount=-CORTAR_EXTRUIR7_DEPTH, mode=Mode.SUBTRACT)

    # Croquis15 → Saliente-Extruir5 (add)
    with BuildSketch(Plane.ZY.offset(22.5)):
        Polygon((29.5, 659), (36.42820323, 663), (36.42820323, 671), (29.5, 675), (22.57179677, 671), (22.57179677, 663), align=None)
    extrude(amount=SALIENTE_EXTRUIR5_DEPTH)


with BuildPart() as cortar_extruir8_tool:
    # Croquis16 → Cortar-Extruir8 (with draft: the straight prism first)
    with BuildSketch(Plane.ZY.offset(30)):
        with BuildLine():
            Line((24.729588918, 691.570175939), (24.729588918, 678.749945473))
            Line((24.729588918, 678.749945473), (17.351920944, 678.749945473))
            Line((17.351920944, 678.749945473), (17.351920944, 645.064765076))
            ThreePointArc((17.351920944, 645.064765076), (54.036709128, 663.082957146), (24.729588918, 691.570175939))
        make_face()
        with Locations((29.345480417, 667)):
            Circle(CROQUIS16_R, mode=Mode.SUBTRACT)
    extrude(amount=-CORTAR_EXTRUIR8_DEPTH)
    # Cortar-Extruir8: the draft: its side faces are tilted about the plane it starts from
    cortar_extruir8_sides = [cortar_extruir8_tool.faces().sort_by_distance(p)[0] for p in [
        (-28.5, 685.160060706, 24.729588918),
        (-28.5, 678.749945473, 21.040754931),
        (-28.5, 661.907355274, 17.351920944),
        (-28.5, 663.082957146, 54.036709128),
        (-28.5, 667, 22.626163097),
    ]]
    draft(cortar_extruir8_sides, Plane.ZY.offset(30), CORTAR_EXTRUIR8_DRAFT)


with BuildPart() as part_1:
    add(part.part)

    # Cortar-Extruir8: cut by cortar_extruir8_tool
    add(cortar_extruir8_tool.part, mode=Mode.SUBTRACT)

    # Redondeo8
    redondeo8_edges = [part_1.edges().sort_by_distance(p)[0] for p in [
        (22.5, 667, 40.5),
        (22.5, 656, 23.25),
        (22.5, 678, 23.25),
        (-22.5, 667, 40.5),
        (-22.5, 656, 23.25),
        (-22.5, 678, 23.25),
    ]]
    fillet(redondeo8_edges, radius=REDONDEO8_R)

    # Croquis17 → Saliente-Extruir6 (add)
    with BuildSketch(Plane(origin=(-22.5, 0, 0), x_dir=(0, 0, -1), z_dir=(1, 0, 0))):
        with Locations(Location((-29.5, 667, 0), (0, 0, 180))):
            Circle(CROQUIS17_R)
    extrude(amount=SALIENTE_EXTRUIR6_DEPTH)

    # Croquis18 → Saliente-Extruir7 (add)
    with BuildSketch(Plane(origin=(22.5, 0, 0), x_dir=(0, 0, -1), z_dir=(1, 0, 0))):
        Polygon((-29.5, 675), (-36.42820323, 671), (-36.42820323, 663), (-29.5, 659), (-22.57179677, 663), (-22.57179677, 671), align=None)
        with Locations((-29.5, 667)):
            Circle(CROQUIS18_R, mode=Mode.SUBTRACT)
    extrude(amount=SALIENTE_EXTRUIR7_DEPTH)


with BuildPart() as cortar_extruir9_tool:
    # Croquis19 → Cortar-Extruir9 (with draft: the straight prism first)
    with BuildSketch(Plane(origin=(30, 0, 0), x_dir=(0, 0, -1), z_dir=(1, 0, 0))):
        with BuildLine():
            ThreePointArc((-24.252980935, 686.078510345), (-48.88237086, 663.019489242), (-17.15857321, 651.533586361))
            Line((-17.15857321, 651.533586361), (-17.15857321, 678.754417994))
            Line((-17.15857321, 678.754417994), (-24.252980935, 678.754417994))
            Line((-24.252980935, 678.754417994), (-24.252980935, 686.078510345))
        make_face()
        with Locations((-29.5, 667)):
            Circle(CROQUIS19_R, mode=Mode.SUBTRACT)
    extrude(amount=-CORTAR_EXTRUIR9_DEPTH)
    # Cortar-Extruir9: the draft: its side faces are tilted about the plane it starts from
    cortar_extruir9_sides = [cortar_extruir9_tool.faces().sort_by_distance(p)[0] for p in [
        (28, 665.144002178, 17.15857321),
        (28, 678.754417994, 20.705777072),
        (28, 682.41646417, 24.252980935),
        (28, 663.019489242, 48.88237086),
        (28, 667, 36.261258256),
    ]]
    draft(cortar_extruir9_sides, Plane(origin=(30, 0, 0), x_dir=(0, 0, -1), z_dir=(1, 0, 0)), CORTAR_EXTRUIR9_DRAFT)


with BuildPart() as part_2:
    add(part_1.part)

    # Cortar-Extruir9: cut by cortar_extruir9_tool
    add(cortar_extruir9_tool.part, mode=Mode.SUBTRACT)


solid = part_2.part
